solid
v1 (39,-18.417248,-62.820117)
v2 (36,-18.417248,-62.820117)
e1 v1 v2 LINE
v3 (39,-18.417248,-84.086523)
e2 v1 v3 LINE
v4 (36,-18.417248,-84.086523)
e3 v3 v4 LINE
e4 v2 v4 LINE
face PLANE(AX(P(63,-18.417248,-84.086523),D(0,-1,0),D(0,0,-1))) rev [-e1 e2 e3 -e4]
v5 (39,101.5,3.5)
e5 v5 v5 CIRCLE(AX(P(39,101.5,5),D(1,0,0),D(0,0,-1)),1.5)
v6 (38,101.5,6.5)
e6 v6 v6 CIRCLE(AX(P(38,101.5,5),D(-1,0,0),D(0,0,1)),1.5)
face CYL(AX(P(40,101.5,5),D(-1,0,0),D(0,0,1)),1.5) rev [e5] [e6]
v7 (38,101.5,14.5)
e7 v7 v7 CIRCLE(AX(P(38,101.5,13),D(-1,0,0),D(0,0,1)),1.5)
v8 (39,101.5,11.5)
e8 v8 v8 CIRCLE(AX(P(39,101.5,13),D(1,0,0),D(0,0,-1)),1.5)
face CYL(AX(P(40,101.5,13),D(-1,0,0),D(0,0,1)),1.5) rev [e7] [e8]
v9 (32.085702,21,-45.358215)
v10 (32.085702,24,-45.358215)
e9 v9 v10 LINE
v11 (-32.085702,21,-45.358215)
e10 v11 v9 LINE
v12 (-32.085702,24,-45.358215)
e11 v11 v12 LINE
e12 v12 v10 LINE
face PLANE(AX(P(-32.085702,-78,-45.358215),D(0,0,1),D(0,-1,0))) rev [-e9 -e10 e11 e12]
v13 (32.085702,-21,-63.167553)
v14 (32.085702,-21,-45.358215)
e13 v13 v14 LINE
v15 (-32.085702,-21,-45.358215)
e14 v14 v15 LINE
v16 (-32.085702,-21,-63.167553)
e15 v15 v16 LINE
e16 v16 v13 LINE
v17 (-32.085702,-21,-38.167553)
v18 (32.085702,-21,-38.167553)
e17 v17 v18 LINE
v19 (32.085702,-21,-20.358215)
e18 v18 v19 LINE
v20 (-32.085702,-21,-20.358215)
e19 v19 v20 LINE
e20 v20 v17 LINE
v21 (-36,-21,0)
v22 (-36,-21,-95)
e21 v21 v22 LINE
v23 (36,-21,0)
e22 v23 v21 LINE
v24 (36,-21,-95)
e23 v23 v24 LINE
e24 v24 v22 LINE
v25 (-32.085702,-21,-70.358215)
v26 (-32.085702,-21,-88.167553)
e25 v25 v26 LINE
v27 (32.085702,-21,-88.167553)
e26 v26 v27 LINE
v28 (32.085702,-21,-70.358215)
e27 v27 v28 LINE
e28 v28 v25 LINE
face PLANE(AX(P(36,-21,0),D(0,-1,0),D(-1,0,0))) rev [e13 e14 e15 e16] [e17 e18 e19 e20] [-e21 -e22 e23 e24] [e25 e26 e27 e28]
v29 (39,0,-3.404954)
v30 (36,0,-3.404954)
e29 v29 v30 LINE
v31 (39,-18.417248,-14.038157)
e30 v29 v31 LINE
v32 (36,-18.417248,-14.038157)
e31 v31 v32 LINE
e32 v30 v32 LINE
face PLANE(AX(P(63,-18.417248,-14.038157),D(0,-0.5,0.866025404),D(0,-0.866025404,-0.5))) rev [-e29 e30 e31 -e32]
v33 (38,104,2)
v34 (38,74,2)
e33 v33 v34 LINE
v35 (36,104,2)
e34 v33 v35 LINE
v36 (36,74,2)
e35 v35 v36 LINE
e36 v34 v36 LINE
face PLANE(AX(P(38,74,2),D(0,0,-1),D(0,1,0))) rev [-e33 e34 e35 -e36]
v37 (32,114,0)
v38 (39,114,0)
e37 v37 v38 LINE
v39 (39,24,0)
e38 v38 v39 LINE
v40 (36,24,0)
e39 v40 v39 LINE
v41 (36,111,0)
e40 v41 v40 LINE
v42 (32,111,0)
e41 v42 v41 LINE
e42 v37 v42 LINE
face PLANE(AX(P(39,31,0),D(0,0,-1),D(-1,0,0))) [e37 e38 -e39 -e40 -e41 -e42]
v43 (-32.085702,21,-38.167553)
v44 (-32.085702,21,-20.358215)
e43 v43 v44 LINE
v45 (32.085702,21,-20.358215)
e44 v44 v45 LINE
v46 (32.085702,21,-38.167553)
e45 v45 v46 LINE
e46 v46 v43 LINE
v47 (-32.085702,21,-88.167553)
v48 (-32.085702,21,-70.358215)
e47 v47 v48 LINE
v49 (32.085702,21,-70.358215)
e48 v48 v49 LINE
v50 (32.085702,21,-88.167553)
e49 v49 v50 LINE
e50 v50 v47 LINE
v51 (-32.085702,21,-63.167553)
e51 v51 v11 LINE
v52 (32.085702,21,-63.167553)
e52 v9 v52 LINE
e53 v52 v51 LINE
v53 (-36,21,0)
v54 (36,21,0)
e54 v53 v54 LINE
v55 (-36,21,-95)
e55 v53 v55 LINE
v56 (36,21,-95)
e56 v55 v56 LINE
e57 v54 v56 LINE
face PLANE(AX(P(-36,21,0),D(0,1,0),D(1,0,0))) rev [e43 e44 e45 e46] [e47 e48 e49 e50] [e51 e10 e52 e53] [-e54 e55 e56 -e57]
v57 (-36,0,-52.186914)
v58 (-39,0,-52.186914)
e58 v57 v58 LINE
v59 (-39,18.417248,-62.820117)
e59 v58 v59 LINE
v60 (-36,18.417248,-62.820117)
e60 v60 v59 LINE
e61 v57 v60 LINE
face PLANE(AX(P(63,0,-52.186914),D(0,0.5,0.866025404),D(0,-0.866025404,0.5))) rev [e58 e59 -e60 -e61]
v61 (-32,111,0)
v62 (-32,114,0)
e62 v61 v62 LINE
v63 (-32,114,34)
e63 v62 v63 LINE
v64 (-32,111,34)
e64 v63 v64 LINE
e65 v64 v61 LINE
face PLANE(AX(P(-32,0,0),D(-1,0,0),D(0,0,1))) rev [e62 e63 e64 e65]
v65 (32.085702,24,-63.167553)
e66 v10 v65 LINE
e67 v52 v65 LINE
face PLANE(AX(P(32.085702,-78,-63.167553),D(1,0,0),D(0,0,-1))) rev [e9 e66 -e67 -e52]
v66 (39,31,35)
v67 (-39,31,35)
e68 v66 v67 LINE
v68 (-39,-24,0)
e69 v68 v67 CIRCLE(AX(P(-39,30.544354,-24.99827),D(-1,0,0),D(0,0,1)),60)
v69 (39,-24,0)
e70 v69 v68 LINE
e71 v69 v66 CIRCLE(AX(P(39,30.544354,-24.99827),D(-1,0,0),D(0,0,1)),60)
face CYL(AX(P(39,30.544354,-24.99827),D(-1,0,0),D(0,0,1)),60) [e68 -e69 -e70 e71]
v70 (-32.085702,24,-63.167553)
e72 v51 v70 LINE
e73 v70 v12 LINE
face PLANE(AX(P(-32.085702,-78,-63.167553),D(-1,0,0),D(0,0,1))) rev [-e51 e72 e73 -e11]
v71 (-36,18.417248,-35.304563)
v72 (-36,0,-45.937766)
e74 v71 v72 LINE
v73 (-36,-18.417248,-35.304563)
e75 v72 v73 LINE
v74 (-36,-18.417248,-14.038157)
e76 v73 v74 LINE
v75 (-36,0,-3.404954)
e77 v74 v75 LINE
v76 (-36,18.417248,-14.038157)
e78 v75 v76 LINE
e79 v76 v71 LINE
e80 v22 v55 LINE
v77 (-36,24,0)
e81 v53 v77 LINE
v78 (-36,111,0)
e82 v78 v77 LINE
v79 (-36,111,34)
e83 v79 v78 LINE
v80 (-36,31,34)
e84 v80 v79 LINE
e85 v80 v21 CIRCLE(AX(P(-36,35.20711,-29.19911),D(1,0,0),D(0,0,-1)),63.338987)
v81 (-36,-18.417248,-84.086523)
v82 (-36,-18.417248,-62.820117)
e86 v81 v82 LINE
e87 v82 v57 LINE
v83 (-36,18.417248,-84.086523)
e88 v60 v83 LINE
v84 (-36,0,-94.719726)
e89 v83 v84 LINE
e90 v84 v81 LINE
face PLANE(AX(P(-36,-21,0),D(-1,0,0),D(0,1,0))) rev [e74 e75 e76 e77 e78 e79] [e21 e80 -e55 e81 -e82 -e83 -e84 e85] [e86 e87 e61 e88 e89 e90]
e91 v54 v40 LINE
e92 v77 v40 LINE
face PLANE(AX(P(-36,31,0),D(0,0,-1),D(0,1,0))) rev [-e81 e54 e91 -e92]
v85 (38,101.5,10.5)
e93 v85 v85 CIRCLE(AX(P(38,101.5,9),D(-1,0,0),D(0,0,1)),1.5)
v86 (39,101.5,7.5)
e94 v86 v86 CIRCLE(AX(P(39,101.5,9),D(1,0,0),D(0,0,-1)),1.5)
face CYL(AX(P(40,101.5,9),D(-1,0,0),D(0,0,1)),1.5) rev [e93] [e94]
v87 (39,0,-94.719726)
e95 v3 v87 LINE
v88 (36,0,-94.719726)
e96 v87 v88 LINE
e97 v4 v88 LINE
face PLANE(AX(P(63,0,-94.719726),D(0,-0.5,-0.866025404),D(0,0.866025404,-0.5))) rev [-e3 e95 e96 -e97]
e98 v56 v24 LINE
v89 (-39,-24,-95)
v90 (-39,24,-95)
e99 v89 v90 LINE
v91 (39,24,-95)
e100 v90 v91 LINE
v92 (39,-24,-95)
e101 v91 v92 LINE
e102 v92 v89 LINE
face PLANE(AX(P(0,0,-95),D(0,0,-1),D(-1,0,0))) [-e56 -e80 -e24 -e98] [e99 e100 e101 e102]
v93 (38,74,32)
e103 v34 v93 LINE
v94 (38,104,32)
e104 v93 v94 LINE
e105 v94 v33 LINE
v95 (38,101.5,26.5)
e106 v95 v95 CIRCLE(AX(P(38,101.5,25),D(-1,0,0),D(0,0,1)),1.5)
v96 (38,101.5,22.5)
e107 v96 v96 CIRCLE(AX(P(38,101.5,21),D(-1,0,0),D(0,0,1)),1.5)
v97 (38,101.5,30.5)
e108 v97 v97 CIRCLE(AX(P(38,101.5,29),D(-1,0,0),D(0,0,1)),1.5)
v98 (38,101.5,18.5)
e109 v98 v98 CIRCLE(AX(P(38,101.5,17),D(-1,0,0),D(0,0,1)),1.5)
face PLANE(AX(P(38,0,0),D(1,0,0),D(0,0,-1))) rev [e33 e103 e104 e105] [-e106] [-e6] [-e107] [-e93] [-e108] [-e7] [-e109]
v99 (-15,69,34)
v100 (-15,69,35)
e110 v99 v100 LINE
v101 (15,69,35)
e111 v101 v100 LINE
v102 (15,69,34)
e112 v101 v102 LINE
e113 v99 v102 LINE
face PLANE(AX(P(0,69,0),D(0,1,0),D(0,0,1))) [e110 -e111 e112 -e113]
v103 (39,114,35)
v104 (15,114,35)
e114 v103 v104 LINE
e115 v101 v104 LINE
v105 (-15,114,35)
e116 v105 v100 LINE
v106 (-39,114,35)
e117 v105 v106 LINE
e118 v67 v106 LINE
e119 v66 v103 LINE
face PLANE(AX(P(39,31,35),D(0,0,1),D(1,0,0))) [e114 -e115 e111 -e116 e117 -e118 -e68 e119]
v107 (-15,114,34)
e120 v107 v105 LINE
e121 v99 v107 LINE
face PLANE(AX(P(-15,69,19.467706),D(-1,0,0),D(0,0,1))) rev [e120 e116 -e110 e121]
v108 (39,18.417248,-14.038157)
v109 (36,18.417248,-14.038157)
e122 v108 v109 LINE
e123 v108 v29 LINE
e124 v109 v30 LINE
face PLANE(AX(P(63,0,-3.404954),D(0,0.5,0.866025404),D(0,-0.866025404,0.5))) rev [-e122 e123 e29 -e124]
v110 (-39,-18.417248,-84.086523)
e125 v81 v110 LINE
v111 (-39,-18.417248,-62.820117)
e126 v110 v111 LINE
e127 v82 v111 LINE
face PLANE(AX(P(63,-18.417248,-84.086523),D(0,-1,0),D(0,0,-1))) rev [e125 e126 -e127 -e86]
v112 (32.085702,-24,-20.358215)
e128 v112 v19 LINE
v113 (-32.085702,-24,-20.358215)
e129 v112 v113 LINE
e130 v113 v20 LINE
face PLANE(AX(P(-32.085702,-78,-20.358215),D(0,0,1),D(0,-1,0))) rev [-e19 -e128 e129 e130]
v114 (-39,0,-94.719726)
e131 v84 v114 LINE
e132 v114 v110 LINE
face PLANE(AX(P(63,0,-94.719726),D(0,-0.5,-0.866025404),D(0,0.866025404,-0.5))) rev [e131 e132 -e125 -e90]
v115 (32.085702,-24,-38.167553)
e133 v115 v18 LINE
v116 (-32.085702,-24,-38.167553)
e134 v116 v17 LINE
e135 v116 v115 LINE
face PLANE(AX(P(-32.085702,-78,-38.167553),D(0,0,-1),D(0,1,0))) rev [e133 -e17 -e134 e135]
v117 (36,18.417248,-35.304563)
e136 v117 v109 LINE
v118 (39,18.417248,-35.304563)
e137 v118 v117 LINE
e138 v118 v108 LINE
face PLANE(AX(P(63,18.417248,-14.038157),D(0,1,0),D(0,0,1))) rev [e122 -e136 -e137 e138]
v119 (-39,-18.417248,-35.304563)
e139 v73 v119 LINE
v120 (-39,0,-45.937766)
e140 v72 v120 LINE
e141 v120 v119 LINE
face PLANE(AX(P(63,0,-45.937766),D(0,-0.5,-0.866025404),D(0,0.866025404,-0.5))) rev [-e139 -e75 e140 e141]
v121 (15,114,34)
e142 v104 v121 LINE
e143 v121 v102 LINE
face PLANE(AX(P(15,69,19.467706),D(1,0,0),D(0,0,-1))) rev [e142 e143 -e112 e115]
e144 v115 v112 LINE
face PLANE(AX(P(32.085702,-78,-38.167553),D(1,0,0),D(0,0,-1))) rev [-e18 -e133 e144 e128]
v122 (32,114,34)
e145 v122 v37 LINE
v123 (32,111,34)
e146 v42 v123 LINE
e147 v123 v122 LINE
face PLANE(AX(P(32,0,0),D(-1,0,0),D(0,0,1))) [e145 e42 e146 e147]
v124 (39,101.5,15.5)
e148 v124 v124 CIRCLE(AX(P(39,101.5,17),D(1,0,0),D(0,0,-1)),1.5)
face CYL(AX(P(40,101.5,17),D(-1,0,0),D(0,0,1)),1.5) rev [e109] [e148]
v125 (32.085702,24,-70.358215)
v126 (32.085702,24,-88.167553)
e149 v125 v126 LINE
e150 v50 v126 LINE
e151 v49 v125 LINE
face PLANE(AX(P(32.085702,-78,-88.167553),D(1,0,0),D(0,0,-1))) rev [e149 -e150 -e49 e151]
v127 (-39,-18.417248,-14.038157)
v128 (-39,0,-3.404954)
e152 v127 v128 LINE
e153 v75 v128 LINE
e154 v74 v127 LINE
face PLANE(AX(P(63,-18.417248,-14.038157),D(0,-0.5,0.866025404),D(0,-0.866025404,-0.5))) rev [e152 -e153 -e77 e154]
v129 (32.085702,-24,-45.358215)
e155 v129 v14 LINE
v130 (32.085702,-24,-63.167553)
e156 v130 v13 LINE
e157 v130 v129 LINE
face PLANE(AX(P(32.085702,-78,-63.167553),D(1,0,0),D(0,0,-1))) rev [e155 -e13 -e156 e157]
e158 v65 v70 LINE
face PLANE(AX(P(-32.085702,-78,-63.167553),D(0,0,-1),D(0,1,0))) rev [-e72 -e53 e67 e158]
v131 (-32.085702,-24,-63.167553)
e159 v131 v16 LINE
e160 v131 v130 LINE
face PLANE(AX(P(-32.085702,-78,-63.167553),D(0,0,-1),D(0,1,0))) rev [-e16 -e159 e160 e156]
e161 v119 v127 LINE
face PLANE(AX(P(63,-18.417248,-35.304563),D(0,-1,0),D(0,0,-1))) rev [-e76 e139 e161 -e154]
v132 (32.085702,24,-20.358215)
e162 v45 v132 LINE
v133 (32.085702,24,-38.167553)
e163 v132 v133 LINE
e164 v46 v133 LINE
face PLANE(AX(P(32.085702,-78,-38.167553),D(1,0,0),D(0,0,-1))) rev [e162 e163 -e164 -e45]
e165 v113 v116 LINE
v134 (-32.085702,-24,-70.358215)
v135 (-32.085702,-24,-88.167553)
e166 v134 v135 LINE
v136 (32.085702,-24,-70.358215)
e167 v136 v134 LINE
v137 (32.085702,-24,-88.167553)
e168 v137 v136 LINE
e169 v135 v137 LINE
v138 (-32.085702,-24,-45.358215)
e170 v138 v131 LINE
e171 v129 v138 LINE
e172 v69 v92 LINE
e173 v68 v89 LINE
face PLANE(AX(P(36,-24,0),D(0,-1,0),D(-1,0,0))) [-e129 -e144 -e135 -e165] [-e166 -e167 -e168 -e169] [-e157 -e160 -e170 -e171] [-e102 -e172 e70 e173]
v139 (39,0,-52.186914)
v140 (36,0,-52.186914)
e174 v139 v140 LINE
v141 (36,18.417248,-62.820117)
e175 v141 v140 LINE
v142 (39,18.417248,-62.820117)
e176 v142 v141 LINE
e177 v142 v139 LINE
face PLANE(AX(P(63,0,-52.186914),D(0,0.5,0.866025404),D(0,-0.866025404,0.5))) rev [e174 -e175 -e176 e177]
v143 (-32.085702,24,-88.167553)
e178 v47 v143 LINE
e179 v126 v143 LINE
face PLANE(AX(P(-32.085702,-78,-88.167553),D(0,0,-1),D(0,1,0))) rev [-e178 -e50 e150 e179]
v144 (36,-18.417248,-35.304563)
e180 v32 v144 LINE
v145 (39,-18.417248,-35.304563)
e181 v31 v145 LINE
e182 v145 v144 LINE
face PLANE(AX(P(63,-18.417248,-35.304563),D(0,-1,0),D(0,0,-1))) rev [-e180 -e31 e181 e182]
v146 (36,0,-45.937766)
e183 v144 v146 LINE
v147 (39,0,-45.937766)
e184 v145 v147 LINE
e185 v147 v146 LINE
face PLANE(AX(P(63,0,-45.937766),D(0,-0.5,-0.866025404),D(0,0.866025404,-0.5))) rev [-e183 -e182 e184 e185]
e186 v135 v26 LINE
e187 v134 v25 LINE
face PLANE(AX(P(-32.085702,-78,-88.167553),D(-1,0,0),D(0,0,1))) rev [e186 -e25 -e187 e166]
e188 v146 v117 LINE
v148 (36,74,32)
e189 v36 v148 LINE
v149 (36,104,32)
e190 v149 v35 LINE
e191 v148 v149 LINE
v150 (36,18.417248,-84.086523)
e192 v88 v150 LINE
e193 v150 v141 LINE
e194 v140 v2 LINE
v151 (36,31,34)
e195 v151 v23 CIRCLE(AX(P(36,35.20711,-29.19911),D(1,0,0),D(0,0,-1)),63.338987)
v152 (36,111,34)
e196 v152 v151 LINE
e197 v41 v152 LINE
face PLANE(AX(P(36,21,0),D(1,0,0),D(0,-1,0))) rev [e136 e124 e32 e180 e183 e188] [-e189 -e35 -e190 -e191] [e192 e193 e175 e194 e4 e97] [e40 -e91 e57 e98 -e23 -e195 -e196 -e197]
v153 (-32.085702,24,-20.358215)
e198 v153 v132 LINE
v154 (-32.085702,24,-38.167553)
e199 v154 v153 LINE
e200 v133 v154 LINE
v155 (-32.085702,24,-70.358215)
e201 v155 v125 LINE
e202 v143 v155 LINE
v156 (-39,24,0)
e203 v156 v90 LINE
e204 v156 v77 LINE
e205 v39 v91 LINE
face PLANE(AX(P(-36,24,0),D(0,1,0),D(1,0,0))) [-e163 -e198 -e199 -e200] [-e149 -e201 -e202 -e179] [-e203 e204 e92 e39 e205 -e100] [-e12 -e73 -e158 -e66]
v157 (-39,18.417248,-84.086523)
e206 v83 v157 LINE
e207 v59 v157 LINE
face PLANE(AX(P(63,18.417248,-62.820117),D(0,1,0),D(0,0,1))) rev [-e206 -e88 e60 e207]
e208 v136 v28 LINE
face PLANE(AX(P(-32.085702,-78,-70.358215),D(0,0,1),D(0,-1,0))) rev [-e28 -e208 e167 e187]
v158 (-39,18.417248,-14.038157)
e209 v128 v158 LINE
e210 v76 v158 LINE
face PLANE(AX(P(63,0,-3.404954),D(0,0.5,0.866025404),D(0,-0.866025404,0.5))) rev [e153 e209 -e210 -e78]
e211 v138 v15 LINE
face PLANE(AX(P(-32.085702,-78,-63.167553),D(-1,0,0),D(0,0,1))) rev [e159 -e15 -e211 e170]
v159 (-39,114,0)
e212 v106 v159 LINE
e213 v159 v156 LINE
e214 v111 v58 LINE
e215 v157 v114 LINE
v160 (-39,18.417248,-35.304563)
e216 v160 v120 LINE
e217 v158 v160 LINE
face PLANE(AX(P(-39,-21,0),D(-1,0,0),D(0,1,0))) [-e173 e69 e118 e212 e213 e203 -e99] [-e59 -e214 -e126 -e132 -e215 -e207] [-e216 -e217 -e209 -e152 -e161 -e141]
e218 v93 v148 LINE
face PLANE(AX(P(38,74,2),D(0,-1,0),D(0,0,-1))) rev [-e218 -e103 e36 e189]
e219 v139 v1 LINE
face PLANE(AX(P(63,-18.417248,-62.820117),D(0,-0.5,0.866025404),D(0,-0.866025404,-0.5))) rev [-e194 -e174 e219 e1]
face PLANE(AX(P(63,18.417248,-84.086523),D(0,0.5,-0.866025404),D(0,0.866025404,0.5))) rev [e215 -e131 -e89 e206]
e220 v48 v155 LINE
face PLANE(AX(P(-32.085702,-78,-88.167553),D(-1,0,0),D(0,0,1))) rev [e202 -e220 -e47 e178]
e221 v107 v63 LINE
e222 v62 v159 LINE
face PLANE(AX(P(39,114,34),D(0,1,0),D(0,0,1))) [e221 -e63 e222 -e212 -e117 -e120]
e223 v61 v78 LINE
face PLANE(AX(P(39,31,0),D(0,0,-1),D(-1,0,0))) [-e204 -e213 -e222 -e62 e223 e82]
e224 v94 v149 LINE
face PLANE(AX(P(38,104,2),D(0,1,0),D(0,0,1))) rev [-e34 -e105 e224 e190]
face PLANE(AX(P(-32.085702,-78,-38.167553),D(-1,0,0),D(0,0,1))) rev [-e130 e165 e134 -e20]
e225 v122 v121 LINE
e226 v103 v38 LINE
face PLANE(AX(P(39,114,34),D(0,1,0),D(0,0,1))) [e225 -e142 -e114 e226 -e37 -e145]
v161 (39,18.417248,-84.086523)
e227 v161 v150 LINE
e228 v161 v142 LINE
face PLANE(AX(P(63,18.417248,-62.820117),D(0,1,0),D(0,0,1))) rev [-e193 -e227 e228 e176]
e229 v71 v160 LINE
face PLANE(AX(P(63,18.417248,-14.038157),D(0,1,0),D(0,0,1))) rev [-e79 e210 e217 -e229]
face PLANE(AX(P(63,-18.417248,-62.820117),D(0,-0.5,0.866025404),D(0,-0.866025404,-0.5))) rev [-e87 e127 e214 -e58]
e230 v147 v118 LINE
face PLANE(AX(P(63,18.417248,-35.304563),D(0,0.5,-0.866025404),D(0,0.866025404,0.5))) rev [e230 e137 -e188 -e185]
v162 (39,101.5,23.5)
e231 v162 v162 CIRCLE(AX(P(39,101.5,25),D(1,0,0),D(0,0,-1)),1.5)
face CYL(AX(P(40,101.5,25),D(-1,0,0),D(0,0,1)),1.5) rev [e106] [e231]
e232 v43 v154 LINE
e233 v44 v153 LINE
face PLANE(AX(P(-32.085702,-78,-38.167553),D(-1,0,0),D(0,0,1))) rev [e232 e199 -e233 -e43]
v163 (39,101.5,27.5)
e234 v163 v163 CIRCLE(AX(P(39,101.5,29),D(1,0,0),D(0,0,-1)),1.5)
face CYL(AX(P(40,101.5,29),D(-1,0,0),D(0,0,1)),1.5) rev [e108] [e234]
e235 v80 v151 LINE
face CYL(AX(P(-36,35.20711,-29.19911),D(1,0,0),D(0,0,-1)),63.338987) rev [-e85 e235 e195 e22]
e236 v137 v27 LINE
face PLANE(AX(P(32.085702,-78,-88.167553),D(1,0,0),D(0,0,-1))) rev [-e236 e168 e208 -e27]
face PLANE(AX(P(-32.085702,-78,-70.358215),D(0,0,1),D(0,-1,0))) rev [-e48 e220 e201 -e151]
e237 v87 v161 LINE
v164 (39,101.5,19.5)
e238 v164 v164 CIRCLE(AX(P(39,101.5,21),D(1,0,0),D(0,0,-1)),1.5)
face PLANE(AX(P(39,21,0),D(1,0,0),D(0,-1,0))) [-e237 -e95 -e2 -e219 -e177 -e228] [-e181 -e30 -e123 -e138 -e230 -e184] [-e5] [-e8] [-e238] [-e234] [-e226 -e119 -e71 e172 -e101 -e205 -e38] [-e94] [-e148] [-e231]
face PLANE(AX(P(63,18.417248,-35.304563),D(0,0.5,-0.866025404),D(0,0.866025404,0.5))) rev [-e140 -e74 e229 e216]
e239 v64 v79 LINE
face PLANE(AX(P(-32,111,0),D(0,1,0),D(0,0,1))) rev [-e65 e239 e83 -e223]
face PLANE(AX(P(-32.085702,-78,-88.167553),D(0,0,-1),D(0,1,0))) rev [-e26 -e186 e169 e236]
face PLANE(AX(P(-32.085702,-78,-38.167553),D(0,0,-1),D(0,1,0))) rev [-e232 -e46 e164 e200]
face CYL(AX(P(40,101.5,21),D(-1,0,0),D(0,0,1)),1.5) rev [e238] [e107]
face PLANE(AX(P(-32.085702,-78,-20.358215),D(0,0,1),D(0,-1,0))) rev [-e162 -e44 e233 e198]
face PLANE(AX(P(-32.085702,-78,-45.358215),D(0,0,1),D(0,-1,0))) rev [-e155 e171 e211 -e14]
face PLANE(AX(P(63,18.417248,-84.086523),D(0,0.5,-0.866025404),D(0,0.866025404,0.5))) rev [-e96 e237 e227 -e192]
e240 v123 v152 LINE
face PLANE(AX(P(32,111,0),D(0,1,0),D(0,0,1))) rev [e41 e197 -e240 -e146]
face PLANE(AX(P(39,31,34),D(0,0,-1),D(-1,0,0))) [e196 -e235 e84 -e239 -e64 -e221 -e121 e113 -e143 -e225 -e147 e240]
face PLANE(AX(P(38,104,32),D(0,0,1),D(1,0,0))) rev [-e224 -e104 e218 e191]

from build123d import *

# Parameters (mm, degrees)
BOUNDARY2_START       = -200
BOUNDARY2_OUTLINE_W   = 78
BOUNDARY2_OUTLINE_H   = 48
BOUNDARY2_OUTLINE_W_2 = 72
BOUNDARY2_OUTLINE_H_2 = 42
BOUNDARY2_DEPTH       = 200
BOSS_EXTRUDE1_DEPTH   = 78
CUT_EXTRUDE7_DEPTH    = 72
SKETCH9_W             = 1
SKETCH9_H             = 83
BOSS_EXTRUDE2_DEPTH   = 78
SKETCH10_W            = 34
SKETCH10_H            = 83
BOSS_EXTRUDE3_DEPTH   = 3
SKETCH11_W            = 34
SKETCH11_H            = 83
BOSS_EXTRUDE4_DEPTH   = 3
SKETCH12_W            = 30
SKETCH12_H            = 30
CUT_EXTRUDE8_DEPTH    = 2
SKETCH13_R            = 1.5
CUT_EXTRUDE9_DEPTH    = 2
SKETCH14_W            = 30
SKETCH14_H            = 29.06458826
CUT_EXTRUDE10_DEPTH   = 45
CUT_EXTRUDE14_DEPTH   = 102
SKETCH19_W            = 64.171404934
SKETCH19_H            = 17.809337631
CUT_EXTRUDE15_DEPTH   = 102
SKETCH22_W            = 34
SKETCH22_H            = 3
BOSS_EXTRUDE5_DEPTH   = 4
SKETCH23_W            = 34
SKETCH23_H            = 3
BOSS_EXTRUDE6_DEPTH   = 4
IZIM1_W               = 78
IZIM1_H               = 48
IZIM1_W_2             = 72
IZIM1_H_2             = 42
KES_EKSTR_ZYON2_DEPTH = 105


# Read off the part's stored shape, not the designer's step: Boundary2
with BuildPart() as part:
    # Boundary2 outline → Boundary2 (new body)
    with BuildSketch(Plane.XY.offset(BOUNDARY2_START)):
        Rectangle(BOUNDARY2_OUTLINE_W, BOUNDARY2_OUTLINE_H)
        Rectangle(BOUNDARY2_OUTLINE_W_2, BOUNDARY2_OUTLINE_H_2, mode=Mode.SUBTRACT)
    extrude(amount=BOUNDARY2_DEPTH)

    # Sketch4 → Boss-Extrude1 (add)
    with BuildSketch(Plane.ZY.offset(39)):
        with BuildLine():
            Line((35, 31), (0, 31))
            Line((0, 31), (0, -24))
            ThreePointArc((0, -24), (25.621419403, -1.668175984), (35, 31))
        make_face()
    extrude(amount=-BOSS_EXTRUDE1_DEPTH)

    # Sketch7 → Cut-Extrude7 (cut)
    with BuildSketch(Plane(origin=(36, 0, 0), x_dir=(0, 0, -1), z_dir=(1, 0, 0))):
        with BuildLine():
            Line((-34, 31), (0, 31))
            Line((0, 31), (0, -21))
            ThreePointArc((0, -21), (-23.813697573, 0.544890049), (-34, 31))
        make_face()
    extrude(amount=-CUT_EXTRUDE7_DEPTH, mode=Mode.SUBTRACT)

    # Sketch9 → Boss-Extrude2 (add)
    with BuildSketch(Plane.ZY.offset(39)):
        with Locations((34.5, 72.5)):
            Rectangle(SKETCH9_W, SKETCH9_H)
    extrude(amount=-BOSS_EXTRUDE2_DEPTH)

    # Sketch10 → Boss-Extrude3 (add)
    with BuildSketch(Plane(origin=(39, 0, 0), x_dir=(0, 0, -1), z_dir=(1, 0, 0))):
        with Locations((-17, 72.5)):
            Rectangle(SKETCH10_W, SKETCH10_H)
    extrude(amount=-BOSS_EXTRUDE3_DEPTH)

    # Sketch11 → Boss-Extrude4 (add)
    with BuildSketch(Plane.ZY.offset(39)):
        with Locations((17, 72.5)):
            Rectangle(SKETCH11_W, SKETCH11_H)
    extrude(amount=-BOSS_EXTRUDE4_DEPTH)

    # Sketch12 → Cut-Extrude8 (cut)
    with BuildSketch(Plane.ZY.offset(-36)):
        with Locations((17, 89)):
            Rectangle(SKETCH12_W, SKETCH12_H)
    extrude(amount=-CUT_EXTRUDE8_DEPTH, mode=Mode.SUBTRACT)

    # Sketch13 → Cut-Extrude9 (cut)
    with BuildSketch(Plane.ZY.offset(-38)):
        with Locations((5, 101.5)):
            Circle(SKETCH13_R)
        with Locations((9, 101.5)):
            Circle(SKETCH13_R)
        with Locations((13, 101.5)):
            Circle(SKETCH13_R)
        with Locations((17, 101.5)):
            Circle(SKETCH13_R)
        with Locations((21, 101.5)):
            Circle(SKETCH13_R)
        with Locations((25, 101.5)):
            Circle(SKETCH13_R)
        with Locations((29, 101.5)):
            Circle(SKETCH13_R)
    extrude(amount=-CUT_EXTRUDE9_DEPTH, mode=Mode.SUBTRACT)

    # Sketch14 → Cut-Extrude10 (cut)
    with BuildSketch(Plane(origin=(0, 114, 0), x_dir=(1, 0, 0), z_dir=(0, 1, 0))):
        with Locations((0, -34)):
            Rectangle(SKETCH14_W, SKETCH14_H)
    extrude(amount=-CUT_EXTRUDE10_DEPTH, mode=Mode.SUBTRACT)

    # Sketch17 → Cut-Extrude14 (cut)
    with BuildSketch(Plane.ZY.offset(39)):
        Polygon((-100.968873407, 0), (-111.602076583, 18.417248148), (-132.868482935, 18.417248148), (-143.501686111, 0), (-132.868482935, -18.417248148), (-111.602076583, -18.417248148), align=None)
        Polygon((-149.750833218, 0), (-160.384036394, 18.417248148), (-181.650442746, 18.417248148), (-192.283645923, 0), (-181.650442746, -18.417248148), (-160.384036394, -18.417248148), align=None)
        Polygon((-52.186913596, 0), (-62.820116772, 18.417248148), (-84.086523124, 18.417248148), (-94.7197263, 0), (-84.086523124, -18.417248148), (-62.820116772, -18.417248148), align=None)
        Polygon((-3.404953785, 0), (-14.038156961, 18.417248148), (-35.304563313, 18.417248148), (-45.937766489, 0), (-35.304563313, -18.417248148), (-14.038156961, -18.417248148), align=None)
    extrude(amount=-CUT_EXTRUDE14_DEPTH, mode=Mode.SUBTRACT)

    # Sketch19 → Cut-Extrude15 (cut)
    with BuildSketch(Plane(origin=(0, 24, 0), x_dir=(1, 0, 0), z_dir=(0, 1, 0))):
        with Locations((0, 154.262884124)):
            Rectangle(SKETCH19_W, SKETCH19_H)
        with Locations((0, 179.262884124)):
            Rectangle(SKETCH19_W, SKETCH19_H)
        with Locations((0, 129.262884124)):
            Rectangle(SKETCH19_W, SKETCH19_H)
        with Locations((0, 104.262884124)):
            Rectangle(SKETCH19_W, SKETCH19_H)
        with Locations((0, 79.262884124)):
            Rectangle(SKETCH19_W, SKETCH19_H)
        with Locations((0, 54.262884124)):
            Rectangle(SKETCH19_W, SKETCH19_H)
        with Locations((0, 29.262884124)):
            Rectangle(SKETCH19_W, SKETCH19_H)
    extrude(amount=-CUT_EXTRUDE15_DEPTH, mode=Mode.SUBTRACT)

    # Sketch22 → Boss-Extrude5 (add)
    with BuildSketch(Plane(origin=(-36, 0, 0), x_dir=(0, 0, -1), z_dir=(1, 0, 0))):
        with Locations((-17, 112.5)):
            Rectangle(SKETCH22_W, SKETCH22_H)
    extrude(amount=BOSS_EXTRUDE5_DEPTH)

    # Sketch23 → Boss-Extrude6 (add)
    with BuildSketch(Plane.ZY.offset(-36)):
        with Locations((17, 112.5)):
            Rectangle(SKETCH23_W, SKETCH23_H)
    extrude(amount=BOSS_EXTRUDE6_DEPTH)

    # Çizim1 → Kes-Ekstrüzyon2 (cut)
    with BuildSketch(Plane(origin=(0, 0, -200), x_dir=(-1, 0, 0), z_dir=(0, 0, -1))):
        Rectangle(IZIM1_W, IZIM1_H)
        Rectangle(IZIM1_W_2, IZIM1_H_2, mode=Mode.SUBTRACT)
    extrude(amount=-KES_EKSTR_ZYON2_DEPTH, mode=Mode.SUBTRACT)


solid = part.part
